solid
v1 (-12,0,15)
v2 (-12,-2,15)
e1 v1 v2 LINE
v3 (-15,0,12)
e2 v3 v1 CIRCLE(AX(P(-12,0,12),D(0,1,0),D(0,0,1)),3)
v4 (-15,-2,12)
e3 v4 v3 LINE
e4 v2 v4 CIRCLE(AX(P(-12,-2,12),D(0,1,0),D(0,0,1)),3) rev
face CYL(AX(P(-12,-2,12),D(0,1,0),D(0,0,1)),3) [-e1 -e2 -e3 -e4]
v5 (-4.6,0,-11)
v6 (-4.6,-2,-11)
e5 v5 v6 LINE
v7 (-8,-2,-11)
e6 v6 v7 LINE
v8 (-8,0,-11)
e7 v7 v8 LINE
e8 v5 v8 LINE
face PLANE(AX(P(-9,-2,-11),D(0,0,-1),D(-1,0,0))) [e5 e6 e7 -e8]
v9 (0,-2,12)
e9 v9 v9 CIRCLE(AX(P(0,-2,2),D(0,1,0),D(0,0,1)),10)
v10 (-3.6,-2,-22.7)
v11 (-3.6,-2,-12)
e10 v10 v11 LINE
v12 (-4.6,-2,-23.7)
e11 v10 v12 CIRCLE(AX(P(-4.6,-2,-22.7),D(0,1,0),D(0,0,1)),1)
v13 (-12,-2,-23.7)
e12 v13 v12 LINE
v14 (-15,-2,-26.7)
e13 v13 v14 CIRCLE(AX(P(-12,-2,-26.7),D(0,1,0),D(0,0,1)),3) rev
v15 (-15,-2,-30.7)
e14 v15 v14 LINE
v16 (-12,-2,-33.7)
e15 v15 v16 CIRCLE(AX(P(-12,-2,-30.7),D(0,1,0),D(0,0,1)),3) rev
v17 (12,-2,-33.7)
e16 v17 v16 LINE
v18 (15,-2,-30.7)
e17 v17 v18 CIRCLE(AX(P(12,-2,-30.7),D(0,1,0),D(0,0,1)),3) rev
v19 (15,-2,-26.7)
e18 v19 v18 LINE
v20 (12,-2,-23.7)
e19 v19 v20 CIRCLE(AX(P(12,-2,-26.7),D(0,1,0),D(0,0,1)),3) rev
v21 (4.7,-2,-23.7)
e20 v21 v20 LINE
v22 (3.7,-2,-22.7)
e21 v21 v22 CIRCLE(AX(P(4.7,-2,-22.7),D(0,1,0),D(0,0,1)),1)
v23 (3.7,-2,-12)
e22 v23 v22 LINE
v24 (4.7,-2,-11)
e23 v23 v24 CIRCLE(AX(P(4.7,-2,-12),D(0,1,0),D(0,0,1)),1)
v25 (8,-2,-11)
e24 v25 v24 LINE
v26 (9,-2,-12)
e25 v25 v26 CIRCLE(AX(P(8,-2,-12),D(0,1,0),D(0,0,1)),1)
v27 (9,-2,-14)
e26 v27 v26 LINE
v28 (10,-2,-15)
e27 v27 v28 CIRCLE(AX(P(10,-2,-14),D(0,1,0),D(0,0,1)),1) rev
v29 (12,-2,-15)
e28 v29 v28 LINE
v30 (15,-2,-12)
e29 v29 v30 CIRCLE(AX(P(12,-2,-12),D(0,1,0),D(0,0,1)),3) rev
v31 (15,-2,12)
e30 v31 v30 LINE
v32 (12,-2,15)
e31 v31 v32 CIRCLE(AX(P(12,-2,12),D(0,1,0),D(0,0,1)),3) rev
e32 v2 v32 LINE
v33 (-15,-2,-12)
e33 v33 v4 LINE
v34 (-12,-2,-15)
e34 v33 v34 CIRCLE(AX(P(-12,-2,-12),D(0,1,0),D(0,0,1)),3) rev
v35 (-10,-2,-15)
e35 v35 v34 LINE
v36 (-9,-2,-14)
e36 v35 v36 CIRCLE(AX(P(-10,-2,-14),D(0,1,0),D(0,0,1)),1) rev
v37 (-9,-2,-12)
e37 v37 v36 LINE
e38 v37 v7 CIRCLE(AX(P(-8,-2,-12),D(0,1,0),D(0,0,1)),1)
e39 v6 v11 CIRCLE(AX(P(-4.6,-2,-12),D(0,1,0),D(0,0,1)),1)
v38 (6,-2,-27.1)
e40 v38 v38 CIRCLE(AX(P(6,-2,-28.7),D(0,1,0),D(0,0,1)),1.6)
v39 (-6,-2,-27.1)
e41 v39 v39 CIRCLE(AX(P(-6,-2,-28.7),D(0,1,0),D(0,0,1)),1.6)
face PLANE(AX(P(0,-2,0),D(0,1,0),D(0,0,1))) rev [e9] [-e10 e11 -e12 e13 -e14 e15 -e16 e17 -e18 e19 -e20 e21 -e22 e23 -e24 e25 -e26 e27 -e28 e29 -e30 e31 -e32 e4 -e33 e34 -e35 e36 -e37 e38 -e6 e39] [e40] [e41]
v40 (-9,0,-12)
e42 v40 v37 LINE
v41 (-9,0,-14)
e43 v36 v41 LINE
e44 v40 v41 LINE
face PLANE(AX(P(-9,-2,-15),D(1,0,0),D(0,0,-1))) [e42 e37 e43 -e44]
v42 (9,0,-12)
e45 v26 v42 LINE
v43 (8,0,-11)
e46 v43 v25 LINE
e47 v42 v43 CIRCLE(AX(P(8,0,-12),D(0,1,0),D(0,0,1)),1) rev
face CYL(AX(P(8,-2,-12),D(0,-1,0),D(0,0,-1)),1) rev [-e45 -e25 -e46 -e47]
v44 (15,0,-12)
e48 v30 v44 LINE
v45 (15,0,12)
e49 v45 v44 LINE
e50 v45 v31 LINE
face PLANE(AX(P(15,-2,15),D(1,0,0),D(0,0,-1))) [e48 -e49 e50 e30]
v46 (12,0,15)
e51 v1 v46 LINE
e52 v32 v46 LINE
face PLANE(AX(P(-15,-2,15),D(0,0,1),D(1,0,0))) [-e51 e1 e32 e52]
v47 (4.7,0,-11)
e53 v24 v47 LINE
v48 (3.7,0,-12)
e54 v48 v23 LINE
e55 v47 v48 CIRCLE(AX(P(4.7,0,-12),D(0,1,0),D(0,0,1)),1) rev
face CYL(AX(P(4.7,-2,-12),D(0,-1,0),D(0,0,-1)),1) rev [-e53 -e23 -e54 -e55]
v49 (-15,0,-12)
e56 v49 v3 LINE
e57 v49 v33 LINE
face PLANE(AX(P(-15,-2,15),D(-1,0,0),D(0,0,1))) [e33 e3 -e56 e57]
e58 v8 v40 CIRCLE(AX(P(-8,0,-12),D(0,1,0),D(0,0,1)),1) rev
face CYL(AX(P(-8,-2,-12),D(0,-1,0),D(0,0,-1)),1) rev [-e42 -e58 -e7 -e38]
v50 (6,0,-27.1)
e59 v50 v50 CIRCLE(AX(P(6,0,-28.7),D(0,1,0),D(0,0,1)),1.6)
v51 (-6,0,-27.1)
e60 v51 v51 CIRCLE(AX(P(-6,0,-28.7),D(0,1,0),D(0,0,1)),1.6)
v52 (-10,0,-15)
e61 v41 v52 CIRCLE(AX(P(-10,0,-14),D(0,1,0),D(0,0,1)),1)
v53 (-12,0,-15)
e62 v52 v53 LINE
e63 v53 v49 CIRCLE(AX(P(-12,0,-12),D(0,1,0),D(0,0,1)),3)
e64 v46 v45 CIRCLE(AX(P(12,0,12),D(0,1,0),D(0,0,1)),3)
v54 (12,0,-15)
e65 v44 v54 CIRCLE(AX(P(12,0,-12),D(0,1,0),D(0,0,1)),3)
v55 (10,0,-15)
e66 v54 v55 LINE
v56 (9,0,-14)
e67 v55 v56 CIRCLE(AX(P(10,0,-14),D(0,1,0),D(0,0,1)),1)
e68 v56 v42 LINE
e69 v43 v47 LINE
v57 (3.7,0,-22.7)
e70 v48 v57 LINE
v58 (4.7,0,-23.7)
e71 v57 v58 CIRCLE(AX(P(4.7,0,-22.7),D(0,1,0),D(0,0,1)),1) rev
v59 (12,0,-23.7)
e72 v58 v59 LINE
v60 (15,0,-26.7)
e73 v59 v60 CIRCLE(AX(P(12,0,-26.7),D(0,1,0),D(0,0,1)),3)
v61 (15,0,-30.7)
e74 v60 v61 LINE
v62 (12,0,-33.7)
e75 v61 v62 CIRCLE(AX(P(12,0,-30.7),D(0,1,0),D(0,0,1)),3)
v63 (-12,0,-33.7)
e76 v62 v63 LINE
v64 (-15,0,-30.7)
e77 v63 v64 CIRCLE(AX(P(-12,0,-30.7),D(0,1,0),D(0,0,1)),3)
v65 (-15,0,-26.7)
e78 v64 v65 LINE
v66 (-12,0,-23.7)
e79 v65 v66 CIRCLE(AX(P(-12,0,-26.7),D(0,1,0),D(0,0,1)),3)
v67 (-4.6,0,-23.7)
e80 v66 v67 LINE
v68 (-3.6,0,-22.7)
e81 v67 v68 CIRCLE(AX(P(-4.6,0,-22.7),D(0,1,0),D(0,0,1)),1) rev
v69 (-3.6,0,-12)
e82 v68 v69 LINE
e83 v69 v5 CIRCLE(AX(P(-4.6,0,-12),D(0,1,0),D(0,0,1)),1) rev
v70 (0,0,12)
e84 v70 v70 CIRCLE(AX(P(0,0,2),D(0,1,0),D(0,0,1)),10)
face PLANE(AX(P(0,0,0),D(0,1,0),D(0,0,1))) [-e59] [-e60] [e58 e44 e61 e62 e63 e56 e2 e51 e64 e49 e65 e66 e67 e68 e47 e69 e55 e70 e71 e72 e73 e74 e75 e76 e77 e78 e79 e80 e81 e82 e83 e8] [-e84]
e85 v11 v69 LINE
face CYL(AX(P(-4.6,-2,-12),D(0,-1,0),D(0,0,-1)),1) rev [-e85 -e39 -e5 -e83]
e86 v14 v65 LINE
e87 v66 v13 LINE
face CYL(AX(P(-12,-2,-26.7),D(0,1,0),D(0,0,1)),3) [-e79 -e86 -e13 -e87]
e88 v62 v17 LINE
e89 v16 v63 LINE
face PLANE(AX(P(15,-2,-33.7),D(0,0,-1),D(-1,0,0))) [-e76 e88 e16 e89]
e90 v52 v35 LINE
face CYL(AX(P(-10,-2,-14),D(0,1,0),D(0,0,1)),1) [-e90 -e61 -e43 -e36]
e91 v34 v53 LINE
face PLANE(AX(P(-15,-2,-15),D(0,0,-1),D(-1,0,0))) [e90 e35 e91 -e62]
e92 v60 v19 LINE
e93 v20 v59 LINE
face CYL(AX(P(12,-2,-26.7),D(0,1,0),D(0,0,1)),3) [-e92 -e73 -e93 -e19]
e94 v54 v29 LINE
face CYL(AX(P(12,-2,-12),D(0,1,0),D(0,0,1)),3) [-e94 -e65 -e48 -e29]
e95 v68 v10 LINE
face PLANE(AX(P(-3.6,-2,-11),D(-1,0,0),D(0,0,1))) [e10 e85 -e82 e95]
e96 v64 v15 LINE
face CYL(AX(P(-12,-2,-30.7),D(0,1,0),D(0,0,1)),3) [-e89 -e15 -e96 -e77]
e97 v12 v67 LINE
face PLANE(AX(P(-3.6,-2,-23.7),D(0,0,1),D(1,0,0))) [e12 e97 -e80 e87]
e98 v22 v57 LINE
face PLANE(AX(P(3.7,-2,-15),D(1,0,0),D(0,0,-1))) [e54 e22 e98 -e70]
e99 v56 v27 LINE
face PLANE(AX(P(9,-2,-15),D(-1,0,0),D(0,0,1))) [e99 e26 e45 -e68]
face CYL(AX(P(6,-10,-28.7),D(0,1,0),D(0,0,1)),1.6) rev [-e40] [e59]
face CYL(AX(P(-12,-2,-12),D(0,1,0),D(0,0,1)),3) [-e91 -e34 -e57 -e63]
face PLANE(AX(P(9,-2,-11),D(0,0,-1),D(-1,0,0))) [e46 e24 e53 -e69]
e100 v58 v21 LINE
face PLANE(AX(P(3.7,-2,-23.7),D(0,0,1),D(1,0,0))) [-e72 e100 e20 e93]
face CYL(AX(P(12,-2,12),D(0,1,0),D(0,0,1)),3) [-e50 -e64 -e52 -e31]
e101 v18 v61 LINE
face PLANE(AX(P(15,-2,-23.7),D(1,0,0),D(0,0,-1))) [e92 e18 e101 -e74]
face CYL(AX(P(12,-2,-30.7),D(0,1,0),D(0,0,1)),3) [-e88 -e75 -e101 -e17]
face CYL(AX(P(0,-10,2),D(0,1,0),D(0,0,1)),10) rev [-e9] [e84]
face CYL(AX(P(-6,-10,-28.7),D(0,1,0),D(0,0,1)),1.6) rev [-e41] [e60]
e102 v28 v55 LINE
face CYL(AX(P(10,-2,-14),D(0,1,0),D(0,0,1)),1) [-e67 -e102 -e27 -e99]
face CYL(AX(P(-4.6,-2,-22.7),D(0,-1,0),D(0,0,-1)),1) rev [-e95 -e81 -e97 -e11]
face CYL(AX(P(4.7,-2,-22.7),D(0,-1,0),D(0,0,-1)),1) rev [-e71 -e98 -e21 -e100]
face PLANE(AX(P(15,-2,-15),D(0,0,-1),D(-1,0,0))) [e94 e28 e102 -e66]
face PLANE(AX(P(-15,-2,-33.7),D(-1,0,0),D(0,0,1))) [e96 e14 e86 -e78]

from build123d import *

# Parameters (mm, degrees)
SM_BASE_FLANGE_1_DEPTH = 2
CUT_EXTRUDE_1_DEPTH    = 10
FILLET_1_R             = 3
FILLET_2_R             = 1
CUT_EXTRUDE_3_DEPTH    = 10


# Sheet-metal steps are written as plain solids
with BuildPart() as part:
    # Sketch 1 → 基体-法兰1 (new body)
    with BuildSketch(Plane(origin=(0, 0, 0), x_dir=(1, 0, 0), z_dir=(0, 1, 0))):
        Polygon((15, 15), (9, 15), (9, 11), (3.7, 11), (3.7, 15), (3.7, 23.7), (15, 23.7), (15, 33.7), (-15, 33.7), (-15, 23.7), (-3.6, 23.7), (-3.6, 15), (-3.6, 11), (-9, 11), (-9, 15), (-15, 15), (-15, -15), (15, -15), align=None)
    extrude(amount=-SM_BASE_FLANGE_1_DEPTH)

    # 草图6 → 切除-拉伸1 (cut)
    with BuildSketch(Plane(origin=(0, 0, 0), x_dir=(1, 0, 0), z_dir=(0, 1, 0))):
        with BuildLine():
            Line((-7.6, 28.7), (-6, 28.7))
            Line((-6, 28.7), (-4.4, 28.7))
            ThreePointArc((-4.4, 28.7), (-6, 30.3), (-7.6, 28.7))
        make_face()
        with BuildLine():
            Line((-4.4, 28.7), (-6, 28.7))
            Line((-6, 28.7), (-7.6, 28.7))
            ThreePointArc((-7.6, 28.7), (-6, 27.1), (-4.4, 28.7))
        make_face()
        with BuildLine():
            ThreePointArc((7.6, 28.7), (6, 30.3), (4.4, 28.7))
            Line((4.4, 28.7), (6, 28.7))
            Line((6, 28.7), (7.6, 28.7))
        make_face()
        with BuildLine():
            Line((6, 28.7), (4.4, 28.7))
            ThreePointArc((4.4, 28.7), (6, 27.1), (7.6, 28.7))
            Line((7.6, 28.7), (6, 28.7))
        make_face()
    extrude(amount=-CUT_EXTRUDE_1_DEPTH, mode=Mode.SUBTRACT)

    # 圆角1
    fillet_1_edges = [part.edges().sort_by_distance(p)[0] for p in [
        (15, -1, 15),
        (-15, -1, 15),
        (-15, -1, -15),
        (-15, -1, -23.7),
        (-15, -1, -33.7),
        (15, -1, -33.7),
        (15, -1, -23.7),
        (15, -1, -15),
    ]]
    fillet(fillet_1_edges, radius=FILLET_1_R)

    # 圆角2
    fillet_2_edges = [part.edges().sort_by_distance(p)[0] for p in [
        (-9, -1, -15),
        (-9, -1, -11),
        (-3.6, -1, -11),
        (-3.6, -1, -23.7),
        (3.7, -1, -23.7),
        (3.7, -1, -11),
        (9, -1, -11),
        (9, -1, -15),
    ]]
    fillet(fillet_2_edges, radius=FILLET_2_R)

    # 草图7 → 切除-拉伸3 (cut)
    with BuildSketch(Plane(origin=(0, 0, 0), x_dir=(1, 0, 0), z_dir=(0, 1, 0))):
        with BuildLine():
            ThreePointArc((-10, -2), (0, -12), (10, -2))
            Line((10, -2), (-10, -2))
        make_face()
        with BuildLine():
            Line((-10, -2), (10, -2))
            ThreePointArc((10, -2), (0, 8), (-10, -2))
        make_face()
    extrude(amount=-CUT_EXTRUDE_3_DEPTH, mode=Mode.SUBTRACT)


solid = part.part
